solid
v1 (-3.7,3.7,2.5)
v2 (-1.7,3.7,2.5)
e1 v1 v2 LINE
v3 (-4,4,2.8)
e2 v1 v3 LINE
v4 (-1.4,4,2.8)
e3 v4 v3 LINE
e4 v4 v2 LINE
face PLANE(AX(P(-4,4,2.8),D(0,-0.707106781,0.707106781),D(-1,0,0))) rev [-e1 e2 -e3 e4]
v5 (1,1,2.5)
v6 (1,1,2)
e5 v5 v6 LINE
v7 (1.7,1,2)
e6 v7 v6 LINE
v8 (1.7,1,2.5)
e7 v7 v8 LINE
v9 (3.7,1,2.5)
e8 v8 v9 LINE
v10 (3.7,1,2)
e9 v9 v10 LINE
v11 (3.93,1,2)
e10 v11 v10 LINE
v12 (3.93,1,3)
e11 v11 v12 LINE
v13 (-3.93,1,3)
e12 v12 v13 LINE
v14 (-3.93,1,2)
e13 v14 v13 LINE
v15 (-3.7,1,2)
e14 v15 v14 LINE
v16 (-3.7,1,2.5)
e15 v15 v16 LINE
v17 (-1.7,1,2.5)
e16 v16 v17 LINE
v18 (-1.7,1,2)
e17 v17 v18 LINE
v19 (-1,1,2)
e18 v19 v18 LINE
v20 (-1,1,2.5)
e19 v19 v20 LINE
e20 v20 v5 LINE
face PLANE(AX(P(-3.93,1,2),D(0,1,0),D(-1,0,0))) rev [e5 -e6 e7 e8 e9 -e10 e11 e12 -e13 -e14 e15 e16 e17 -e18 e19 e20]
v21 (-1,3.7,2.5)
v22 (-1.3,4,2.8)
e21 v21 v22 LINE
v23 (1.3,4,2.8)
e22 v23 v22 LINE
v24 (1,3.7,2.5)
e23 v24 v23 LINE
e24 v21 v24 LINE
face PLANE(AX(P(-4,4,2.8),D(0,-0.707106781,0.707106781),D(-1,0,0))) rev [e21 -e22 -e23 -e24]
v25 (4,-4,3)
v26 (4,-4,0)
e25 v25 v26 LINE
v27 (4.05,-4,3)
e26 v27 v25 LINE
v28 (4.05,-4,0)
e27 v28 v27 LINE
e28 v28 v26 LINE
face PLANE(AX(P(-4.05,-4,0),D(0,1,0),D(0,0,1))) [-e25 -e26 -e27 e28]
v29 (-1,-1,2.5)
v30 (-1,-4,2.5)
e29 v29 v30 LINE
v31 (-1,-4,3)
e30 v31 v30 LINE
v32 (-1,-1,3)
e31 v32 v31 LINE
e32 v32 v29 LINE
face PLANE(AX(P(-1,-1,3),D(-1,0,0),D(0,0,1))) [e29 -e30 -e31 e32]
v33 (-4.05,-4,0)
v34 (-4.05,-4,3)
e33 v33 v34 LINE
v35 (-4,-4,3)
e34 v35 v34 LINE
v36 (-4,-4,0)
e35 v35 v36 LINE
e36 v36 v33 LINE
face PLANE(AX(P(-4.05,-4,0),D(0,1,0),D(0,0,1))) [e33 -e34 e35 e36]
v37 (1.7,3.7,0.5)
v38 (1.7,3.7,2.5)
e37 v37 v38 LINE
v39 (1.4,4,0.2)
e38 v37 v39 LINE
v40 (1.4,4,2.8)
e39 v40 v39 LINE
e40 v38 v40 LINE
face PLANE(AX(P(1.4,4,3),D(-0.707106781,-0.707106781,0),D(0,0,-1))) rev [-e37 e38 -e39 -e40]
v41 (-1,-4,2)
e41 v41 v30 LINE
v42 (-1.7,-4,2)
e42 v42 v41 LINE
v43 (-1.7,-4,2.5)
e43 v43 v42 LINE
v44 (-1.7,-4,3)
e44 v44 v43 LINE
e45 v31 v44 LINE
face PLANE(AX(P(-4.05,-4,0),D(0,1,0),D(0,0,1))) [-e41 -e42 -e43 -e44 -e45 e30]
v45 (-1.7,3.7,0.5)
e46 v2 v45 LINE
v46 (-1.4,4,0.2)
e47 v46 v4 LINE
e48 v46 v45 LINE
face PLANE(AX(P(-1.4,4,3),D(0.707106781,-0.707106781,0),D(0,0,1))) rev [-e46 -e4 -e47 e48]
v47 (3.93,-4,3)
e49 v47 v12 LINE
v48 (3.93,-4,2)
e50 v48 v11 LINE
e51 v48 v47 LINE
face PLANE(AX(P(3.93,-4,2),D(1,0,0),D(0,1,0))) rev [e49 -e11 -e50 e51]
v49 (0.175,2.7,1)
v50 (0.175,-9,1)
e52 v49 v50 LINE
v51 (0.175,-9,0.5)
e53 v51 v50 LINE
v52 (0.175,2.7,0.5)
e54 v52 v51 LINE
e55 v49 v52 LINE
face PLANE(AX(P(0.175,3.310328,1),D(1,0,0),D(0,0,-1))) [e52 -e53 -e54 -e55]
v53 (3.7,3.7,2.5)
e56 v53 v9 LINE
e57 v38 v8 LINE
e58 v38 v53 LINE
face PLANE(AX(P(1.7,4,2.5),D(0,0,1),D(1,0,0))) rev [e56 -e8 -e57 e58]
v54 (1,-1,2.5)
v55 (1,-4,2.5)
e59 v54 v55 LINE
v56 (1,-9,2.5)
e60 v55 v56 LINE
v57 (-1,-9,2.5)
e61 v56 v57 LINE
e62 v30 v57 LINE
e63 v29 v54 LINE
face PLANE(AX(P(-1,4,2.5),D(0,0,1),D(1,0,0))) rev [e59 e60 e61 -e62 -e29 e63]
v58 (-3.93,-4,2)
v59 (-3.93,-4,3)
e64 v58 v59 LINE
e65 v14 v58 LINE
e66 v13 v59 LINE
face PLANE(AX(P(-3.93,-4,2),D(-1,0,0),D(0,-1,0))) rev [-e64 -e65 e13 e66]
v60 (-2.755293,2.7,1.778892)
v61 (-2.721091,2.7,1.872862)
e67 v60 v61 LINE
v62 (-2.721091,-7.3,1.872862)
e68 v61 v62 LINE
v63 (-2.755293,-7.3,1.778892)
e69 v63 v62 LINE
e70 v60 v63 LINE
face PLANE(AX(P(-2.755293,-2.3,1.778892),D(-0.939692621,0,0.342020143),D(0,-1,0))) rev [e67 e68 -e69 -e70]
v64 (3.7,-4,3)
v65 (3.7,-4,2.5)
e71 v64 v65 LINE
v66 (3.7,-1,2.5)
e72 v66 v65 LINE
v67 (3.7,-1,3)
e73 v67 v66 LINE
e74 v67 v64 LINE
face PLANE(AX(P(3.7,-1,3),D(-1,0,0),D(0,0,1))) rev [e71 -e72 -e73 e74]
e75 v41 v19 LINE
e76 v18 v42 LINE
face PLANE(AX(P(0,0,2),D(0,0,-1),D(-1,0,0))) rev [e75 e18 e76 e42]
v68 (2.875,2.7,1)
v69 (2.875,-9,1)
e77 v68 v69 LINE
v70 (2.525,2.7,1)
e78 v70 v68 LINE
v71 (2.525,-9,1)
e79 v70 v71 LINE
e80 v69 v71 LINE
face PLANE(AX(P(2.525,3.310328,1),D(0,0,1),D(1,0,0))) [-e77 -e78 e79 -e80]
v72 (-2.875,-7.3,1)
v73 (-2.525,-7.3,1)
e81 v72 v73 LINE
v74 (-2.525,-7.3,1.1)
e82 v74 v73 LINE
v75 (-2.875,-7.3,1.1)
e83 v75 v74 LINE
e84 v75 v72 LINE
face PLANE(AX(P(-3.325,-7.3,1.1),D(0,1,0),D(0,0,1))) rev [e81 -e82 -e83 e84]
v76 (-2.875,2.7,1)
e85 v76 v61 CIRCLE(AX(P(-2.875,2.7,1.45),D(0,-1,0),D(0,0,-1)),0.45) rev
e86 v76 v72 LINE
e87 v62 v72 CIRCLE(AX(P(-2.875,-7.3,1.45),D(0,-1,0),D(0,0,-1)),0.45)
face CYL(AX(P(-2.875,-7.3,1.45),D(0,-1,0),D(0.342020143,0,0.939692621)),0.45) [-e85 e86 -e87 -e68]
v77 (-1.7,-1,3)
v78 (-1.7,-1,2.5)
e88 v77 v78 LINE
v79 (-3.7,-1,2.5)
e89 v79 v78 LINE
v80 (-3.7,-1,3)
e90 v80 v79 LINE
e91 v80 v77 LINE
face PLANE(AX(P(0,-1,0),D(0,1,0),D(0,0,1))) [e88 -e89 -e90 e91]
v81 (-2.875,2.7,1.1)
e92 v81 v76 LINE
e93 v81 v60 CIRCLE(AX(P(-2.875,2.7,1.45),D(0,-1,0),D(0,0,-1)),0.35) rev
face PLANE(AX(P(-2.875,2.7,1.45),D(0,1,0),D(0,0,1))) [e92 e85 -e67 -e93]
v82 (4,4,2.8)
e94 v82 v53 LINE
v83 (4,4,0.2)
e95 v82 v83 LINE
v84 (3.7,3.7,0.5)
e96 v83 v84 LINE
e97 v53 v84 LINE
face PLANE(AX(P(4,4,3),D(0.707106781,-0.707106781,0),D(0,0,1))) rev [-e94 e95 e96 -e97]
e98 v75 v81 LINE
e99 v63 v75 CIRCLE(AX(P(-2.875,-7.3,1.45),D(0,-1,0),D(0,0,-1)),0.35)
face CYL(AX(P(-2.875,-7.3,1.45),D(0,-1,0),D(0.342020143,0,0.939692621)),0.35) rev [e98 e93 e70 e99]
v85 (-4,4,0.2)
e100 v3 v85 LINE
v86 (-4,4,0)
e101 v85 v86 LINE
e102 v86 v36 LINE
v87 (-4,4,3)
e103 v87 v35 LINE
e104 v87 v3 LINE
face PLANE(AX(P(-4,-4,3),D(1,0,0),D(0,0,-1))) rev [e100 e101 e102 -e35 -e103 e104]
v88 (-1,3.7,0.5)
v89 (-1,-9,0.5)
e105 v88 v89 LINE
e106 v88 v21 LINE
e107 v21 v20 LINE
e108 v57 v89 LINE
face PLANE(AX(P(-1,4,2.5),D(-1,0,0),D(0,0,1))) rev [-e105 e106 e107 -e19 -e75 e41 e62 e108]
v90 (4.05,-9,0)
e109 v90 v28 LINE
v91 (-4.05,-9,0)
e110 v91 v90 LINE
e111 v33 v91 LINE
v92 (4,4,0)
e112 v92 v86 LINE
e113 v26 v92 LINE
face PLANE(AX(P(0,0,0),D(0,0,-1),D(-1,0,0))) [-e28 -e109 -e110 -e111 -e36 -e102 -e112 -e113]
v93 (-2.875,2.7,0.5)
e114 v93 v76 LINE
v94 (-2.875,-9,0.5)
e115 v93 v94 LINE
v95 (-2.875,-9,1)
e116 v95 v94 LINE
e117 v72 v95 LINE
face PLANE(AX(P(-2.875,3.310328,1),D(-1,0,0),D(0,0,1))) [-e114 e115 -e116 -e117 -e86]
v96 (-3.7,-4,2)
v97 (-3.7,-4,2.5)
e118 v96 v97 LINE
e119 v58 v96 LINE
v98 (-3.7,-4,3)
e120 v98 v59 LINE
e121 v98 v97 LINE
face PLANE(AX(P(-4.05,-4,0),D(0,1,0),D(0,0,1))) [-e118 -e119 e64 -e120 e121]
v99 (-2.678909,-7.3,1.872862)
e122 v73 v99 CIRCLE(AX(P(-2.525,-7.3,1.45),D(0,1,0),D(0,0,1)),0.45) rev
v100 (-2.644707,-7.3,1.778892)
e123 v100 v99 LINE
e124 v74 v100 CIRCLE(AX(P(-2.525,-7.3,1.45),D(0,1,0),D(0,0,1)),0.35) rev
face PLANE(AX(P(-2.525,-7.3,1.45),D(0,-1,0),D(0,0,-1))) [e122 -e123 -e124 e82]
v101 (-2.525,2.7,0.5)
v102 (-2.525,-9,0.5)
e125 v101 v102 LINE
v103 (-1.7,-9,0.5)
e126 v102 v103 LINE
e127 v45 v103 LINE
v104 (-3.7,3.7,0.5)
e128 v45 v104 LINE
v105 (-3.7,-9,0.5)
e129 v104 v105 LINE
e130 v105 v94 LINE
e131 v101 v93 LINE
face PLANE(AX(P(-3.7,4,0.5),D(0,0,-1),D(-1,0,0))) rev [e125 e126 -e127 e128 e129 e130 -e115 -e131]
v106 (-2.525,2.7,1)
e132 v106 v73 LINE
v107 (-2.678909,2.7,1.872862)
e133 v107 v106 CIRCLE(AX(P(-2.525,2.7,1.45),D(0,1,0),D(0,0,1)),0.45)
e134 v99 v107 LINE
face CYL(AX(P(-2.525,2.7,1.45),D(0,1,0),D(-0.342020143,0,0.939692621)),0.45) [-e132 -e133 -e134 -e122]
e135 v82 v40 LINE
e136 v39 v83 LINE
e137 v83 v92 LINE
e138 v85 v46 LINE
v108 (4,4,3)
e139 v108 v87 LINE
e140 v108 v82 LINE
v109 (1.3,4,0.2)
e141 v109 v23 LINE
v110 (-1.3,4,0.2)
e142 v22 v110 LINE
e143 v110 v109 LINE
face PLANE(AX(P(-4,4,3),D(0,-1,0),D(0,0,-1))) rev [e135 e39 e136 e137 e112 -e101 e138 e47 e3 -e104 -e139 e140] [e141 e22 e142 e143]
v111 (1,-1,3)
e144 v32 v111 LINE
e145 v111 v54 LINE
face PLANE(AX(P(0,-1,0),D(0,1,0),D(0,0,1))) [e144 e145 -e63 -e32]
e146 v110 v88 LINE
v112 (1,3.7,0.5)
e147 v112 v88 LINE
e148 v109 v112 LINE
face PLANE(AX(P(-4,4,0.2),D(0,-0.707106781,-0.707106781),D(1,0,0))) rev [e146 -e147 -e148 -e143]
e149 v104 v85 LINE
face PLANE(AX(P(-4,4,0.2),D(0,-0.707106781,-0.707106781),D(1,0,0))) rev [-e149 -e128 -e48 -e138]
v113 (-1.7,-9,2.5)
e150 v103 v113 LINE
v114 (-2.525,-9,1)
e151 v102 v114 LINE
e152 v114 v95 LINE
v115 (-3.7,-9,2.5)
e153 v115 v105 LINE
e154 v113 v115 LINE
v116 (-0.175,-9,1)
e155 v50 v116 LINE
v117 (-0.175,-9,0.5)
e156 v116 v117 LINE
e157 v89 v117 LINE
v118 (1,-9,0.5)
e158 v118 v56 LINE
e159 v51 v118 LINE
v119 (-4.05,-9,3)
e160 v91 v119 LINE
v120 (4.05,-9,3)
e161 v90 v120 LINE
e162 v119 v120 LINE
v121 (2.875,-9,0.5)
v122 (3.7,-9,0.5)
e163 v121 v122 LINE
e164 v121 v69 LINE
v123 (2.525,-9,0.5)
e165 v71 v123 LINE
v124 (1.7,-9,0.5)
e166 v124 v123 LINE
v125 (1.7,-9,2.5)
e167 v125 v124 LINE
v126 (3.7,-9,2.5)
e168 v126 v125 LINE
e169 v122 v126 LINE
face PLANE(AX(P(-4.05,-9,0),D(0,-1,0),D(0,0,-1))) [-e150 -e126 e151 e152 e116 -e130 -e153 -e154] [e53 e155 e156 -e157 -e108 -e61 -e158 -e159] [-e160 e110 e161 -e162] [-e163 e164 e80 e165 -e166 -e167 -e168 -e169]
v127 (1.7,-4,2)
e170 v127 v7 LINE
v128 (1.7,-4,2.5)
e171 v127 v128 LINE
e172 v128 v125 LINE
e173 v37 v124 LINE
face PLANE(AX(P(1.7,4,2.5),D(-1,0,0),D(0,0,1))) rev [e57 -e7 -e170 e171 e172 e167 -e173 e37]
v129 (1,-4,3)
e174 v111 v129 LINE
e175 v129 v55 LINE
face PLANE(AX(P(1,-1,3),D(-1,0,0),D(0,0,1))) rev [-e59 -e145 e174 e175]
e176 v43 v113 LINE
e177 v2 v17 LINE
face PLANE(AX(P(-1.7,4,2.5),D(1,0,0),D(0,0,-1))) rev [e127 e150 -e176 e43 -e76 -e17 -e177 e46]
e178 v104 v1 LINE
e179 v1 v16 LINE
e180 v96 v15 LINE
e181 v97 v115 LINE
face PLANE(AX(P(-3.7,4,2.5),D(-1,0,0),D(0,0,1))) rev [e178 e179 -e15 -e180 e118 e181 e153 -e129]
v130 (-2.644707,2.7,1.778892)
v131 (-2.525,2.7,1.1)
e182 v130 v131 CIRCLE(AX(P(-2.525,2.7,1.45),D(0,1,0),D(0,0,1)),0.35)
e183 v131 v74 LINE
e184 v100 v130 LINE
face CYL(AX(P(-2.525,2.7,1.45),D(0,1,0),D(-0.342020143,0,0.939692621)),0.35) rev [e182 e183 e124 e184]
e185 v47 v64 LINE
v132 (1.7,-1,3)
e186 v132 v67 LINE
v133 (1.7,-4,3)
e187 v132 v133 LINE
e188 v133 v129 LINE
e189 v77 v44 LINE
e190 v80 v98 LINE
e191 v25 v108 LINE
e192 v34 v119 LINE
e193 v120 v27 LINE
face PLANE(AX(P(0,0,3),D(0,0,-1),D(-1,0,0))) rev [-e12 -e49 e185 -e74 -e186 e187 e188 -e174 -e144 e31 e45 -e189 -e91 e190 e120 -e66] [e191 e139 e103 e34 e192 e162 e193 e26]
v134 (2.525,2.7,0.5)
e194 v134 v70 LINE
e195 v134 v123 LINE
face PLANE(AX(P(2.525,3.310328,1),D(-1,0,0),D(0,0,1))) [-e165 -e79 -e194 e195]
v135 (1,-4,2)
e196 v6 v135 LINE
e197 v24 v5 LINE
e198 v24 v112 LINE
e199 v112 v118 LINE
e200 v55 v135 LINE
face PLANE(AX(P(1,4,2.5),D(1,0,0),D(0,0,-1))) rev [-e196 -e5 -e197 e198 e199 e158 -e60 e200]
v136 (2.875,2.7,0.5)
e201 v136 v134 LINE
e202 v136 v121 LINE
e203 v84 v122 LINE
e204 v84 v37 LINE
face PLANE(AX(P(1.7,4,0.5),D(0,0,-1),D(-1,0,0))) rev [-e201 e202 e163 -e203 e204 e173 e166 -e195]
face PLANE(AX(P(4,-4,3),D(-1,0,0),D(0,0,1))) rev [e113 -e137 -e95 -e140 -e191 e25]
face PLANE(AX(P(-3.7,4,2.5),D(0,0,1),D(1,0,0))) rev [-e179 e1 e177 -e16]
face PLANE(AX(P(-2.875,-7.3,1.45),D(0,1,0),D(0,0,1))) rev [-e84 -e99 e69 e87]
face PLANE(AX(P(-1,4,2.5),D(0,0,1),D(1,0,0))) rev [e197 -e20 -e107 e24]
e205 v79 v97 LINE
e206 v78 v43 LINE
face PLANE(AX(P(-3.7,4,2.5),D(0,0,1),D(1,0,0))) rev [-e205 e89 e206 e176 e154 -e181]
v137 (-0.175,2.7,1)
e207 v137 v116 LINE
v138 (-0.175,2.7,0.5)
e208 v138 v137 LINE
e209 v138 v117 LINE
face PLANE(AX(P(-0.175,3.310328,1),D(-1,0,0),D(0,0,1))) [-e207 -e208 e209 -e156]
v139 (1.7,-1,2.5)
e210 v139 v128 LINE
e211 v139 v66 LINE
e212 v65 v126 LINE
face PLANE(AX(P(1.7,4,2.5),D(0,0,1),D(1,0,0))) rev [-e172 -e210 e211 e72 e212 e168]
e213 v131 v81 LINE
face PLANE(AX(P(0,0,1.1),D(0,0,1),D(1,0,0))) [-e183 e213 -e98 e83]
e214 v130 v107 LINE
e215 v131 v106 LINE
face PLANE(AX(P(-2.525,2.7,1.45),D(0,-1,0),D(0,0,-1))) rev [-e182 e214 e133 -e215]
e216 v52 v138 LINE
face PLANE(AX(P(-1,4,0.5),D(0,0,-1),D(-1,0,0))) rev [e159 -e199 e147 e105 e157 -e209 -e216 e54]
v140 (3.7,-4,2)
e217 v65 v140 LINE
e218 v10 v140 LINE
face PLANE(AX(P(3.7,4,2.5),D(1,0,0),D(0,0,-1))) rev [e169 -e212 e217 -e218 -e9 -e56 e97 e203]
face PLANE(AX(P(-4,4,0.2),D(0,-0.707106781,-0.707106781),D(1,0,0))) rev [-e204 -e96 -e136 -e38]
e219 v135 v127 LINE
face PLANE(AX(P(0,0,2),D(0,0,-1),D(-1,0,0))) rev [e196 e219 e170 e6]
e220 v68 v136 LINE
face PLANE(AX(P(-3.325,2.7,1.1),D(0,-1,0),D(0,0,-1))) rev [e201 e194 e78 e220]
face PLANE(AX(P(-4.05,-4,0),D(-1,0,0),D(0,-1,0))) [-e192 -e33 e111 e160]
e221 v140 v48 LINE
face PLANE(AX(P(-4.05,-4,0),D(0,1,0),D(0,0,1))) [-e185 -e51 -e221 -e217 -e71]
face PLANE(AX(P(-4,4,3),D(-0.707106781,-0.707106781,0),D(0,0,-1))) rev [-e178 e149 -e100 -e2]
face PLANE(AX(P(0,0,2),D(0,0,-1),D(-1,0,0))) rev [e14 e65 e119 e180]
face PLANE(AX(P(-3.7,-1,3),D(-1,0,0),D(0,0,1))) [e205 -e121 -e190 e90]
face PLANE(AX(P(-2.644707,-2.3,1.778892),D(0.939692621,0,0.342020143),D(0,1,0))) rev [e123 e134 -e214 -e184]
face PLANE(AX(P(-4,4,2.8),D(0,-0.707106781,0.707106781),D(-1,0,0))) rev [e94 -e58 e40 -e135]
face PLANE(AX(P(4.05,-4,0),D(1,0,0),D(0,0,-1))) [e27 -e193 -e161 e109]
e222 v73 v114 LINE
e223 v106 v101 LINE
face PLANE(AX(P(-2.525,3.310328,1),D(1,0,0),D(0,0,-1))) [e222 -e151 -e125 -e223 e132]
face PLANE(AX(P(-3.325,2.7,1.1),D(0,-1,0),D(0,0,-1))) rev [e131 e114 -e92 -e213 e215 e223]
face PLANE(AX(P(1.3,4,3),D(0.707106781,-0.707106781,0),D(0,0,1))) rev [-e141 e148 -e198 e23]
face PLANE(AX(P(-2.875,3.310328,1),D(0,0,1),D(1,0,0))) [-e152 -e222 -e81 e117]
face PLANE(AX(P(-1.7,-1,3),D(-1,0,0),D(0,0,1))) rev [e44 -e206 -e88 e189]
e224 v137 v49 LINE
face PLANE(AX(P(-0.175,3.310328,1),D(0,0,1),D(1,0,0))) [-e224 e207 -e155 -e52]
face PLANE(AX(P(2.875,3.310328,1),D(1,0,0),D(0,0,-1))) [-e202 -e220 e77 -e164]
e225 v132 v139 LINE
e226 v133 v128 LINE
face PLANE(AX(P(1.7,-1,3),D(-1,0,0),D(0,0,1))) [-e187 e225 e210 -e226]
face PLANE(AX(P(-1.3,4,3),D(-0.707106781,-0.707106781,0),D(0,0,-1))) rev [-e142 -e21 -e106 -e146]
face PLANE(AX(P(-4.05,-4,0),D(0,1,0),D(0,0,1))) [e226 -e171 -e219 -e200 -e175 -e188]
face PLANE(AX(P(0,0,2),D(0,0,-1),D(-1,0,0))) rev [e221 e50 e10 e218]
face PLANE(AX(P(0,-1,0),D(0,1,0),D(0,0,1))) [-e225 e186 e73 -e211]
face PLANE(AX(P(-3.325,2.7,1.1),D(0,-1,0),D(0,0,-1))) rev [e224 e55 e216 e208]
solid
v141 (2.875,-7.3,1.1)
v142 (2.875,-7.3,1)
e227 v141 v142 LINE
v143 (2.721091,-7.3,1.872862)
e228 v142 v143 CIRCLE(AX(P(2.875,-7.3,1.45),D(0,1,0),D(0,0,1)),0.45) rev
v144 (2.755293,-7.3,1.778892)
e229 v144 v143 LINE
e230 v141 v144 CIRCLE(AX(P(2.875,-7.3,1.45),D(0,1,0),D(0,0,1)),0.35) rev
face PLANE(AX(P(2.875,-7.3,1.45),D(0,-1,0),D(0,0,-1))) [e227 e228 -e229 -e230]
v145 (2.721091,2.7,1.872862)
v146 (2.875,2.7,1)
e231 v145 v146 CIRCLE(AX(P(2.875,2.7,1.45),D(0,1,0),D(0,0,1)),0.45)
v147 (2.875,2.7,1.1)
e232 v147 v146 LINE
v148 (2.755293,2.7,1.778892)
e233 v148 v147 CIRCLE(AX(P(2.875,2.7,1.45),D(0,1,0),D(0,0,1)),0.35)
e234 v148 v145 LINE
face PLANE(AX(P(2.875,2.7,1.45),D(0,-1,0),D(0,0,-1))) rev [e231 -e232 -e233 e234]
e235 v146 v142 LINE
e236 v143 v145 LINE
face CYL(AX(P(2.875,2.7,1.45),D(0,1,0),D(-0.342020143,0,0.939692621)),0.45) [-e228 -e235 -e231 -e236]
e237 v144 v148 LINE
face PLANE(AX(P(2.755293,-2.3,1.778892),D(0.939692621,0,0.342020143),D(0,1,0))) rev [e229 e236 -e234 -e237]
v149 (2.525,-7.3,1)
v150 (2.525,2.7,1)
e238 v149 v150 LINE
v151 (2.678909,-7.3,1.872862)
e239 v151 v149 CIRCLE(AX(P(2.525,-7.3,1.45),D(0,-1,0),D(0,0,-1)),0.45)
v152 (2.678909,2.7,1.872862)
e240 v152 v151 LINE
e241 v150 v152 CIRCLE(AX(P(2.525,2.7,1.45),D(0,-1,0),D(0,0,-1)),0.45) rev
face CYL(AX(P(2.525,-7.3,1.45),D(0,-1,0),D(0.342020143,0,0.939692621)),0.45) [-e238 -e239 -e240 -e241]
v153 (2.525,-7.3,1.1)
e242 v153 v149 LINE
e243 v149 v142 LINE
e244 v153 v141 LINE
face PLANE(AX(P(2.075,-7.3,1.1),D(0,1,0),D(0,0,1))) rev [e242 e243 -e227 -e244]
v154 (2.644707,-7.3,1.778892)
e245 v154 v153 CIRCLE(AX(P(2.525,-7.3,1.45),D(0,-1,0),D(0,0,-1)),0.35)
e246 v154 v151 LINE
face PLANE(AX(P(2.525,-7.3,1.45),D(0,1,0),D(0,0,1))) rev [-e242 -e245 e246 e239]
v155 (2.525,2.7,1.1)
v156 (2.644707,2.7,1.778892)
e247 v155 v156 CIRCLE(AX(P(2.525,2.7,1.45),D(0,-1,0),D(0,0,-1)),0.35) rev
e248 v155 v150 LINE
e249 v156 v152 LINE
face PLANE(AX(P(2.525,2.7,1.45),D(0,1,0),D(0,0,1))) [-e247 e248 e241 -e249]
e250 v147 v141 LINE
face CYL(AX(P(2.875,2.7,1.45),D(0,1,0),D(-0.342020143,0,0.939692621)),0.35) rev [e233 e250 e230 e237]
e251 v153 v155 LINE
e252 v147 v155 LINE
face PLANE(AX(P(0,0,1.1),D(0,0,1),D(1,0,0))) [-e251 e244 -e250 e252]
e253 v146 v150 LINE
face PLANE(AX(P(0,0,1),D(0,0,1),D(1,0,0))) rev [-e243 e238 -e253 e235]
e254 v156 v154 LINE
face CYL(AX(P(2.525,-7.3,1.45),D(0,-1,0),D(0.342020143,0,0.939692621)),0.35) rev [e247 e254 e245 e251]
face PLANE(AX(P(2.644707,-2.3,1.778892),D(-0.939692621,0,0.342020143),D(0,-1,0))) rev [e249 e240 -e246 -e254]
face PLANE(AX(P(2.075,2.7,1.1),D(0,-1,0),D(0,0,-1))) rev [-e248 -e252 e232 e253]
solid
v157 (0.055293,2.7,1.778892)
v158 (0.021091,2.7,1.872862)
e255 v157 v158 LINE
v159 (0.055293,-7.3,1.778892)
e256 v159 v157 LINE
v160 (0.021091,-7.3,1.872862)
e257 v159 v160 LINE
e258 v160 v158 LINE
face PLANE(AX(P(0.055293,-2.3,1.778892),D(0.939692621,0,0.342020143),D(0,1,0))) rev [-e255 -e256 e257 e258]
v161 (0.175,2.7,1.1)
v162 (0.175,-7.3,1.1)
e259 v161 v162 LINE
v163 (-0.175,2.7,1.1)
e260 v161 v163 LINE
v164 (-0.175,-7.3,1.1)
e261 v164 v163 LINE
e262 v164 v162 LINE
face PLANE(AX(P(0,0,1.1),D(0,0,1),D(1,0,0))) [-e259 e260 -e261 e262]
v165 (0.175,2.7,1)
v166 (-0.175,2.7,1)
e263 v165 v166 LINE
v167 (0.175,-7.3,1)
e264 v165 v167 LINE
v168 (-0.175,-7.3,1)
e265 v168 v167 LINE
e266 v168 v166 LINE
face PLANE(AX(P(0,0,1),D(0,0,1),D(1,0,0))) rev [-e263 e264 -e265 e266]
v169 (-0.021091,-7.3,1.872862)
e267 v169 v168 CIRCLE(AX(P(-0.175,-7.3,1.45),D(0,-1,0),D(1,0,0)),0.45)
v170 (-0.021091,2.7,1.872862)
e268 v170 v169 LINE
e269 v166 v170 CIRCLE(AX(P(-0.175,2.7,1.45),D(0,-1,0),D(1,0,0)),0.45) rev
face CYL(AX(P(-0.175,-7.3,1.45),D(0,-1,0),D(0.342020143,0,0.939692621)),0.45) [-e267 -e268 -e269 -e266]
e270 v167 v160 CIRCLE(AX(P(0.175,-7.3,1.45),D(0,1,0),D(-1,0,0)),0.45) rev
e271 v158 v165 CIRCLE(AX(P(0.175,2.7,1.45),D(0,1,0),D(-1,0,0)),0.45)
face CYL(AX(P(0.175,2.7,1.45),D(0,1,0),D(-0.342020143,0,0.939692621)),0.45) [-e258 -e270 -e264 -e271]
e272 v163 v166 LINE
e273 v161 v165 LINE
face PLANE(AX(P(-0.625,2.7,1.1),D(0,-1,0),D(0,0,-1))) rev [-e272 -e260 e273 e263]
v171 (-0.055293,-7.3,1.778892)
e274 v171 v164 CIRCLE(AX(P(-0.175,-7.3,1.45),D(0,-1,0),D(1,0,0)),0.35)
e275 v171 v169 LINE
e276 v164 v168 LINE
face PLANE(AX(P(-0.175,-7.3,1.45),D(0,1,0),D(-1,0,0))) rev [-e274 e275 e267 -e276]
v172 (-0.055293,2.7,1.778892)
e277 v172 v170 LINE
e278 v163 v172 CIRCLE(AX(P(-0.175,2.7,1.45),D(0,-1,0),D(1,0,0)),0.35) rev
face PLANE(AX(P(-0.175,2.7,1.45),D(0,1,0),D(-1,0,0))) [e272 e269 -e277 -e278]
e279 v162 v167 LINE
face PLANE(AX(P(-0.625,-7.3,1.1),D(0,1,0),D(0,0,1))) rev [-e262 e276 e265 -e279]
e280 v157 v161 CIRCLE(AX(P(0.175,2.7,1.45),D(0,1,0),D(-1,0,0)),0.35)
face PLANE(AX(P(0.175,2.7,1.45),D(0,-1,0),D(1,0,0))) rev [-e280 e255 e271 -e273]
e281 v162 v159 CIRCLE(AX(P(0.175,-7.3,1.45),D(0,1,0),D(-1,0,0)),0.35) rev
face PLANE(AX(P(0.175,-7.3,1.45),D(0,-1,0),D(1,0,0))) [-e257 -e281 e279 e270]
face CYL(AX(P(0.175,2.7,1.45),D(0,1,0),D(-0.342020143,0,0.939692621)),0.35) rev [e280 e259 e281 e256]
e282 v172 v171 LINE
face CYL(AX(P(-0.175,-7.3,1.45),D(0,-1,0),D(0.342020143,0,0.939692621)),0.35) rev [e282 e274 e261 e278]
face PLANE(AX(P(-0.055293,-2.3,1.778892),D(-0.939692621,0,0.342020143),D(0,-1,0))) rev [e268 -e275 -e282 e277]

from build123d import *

# Parameters (mm, degrees)
SCHIZZO1_W                        = 8
SCHIZZO1_H                        = 8
ESTRUSIONE_ESTRUSIONE1_DEPTH      = 3
SCHIZZO2_W                        = 7.86
SCHIZZO2_H                        = 5
TAGLIO_ESTRUSIONE2_DEPTH          = 1
ESTRUSIONE_ESTRUSIONE2_DEPTH      = 1
ESTRUSIONE_ESTRUSIONE2_DEPTH_BACK = 2
SCHIZZO4_W                        = 8.1
SCHIZZO4_H                        = 5
TAGLIO_ESTRUSIONE3_DEPTH          = 14.942829698
TAGLIO_ESTRUSIONE3_DEPTH_BACK     = 14.942829698
SCHIZZO5_W                        = 2
SCHIZZO5_H                        = 2
SMUSSO2_SIZE                      = 0.3
SCHIZZO6_W                        = 2
SCHIZZO6_H                        = 0.5
ESTRUSIONE_ESTRUSIONE4_DEPTH      = 3
SCHIZZO7_W                        = 1.25
SCHIZZO7_H                        = 10
BASE_FLANGIA1_DEPTH               = 0.1
ORLO1_START                       = -7.3
ORLO1_DEPTH                       = 10
ORLO1_2_DEPTH                     = 10
ORLO2_START                       = -7.3
ORLO2_DEPTH                       = 10
ORLO2_2_DEPTH                     = 10
SCHIZZO17_W                       = 1.25
SCHIZZO17_H                       = 10
BASE_FLANGIA2_DEPTH               = 0.1
ORLO3_START                       = -7.3
ORLO3_DEPTH                       = 10
ORLO3_2_DEPTH                     = 10
SCHIZZO26_W                       = 1.25
SCHIZZO26_H                       = 10
BASE_FLANGIA3_DEPTH               = 0.1
ORLO4_START                       = -7.3
ORLO4_DEPTH                       = 10
ORLO4_2_DEPTH                     = 10
ORLO5_START                       = -7.3
ORLO5_DEPTH                       = 10
ORLO5_2_DEPTH                     = 10
ESTRUSIONE_ESTRUSIONE5_REACH      = 15.943
SCHIZZO37_W                       = 0.35
SCHIZZO37_H                       = 0.5


# Read off the part's stored shape, not the designer's step: Orlo1, Orlo2, Orlo3, Orlo4, Orlo5
# Sheet-metal steps are written as plain solids
with BuildPart() as part:
    # Schizzo1 → Estrusione-Estrusione1 (new body)
    with BuildSketch(Plane.XY):
        Rectangle(SCHIZZO1_W, SCHIZZO1_H)
    extrude(amount=ESTRUSIONE_ESTRUSIONE1_DEPTH)

    # Schizzo2 → Taglio-Estrusione2 (cut)
    with BuildSketch(Plane.XY.offset(3)):
        with Locations((0, -1.5)):
            Rectangle(SCHIZZO2_W, SCHIZZO2_H)
    extrude(amount=-TAGLIO_ESTRUSIONE2_DEPTH, mode=Mode.SUBTRACT)

    # Schizzo4 → Estrusione-Estrusione2 (add, two sides: drawn at the far end of the back side and taken through both)
    with BuildSketch(Plane.XY.offset(2).offset(-ESTRUSIONE_ESTRUSIONE2_DEPTH_BACK)):
        with Locations((0, -6.5)):
            Rectangle(SCHIZZO4_W, SCHIZZO4_H)
    extrude(amount=ESTRUSIONE_ESTRUSIONE2_DEPTH + ESTRUSIONE_ESTRUSIONE2_DEPTH_BACK)

    # Schizzo5 → Taglio-Estrusione3 (cut, two sides: drawn at the far end of the back side and taken through both)
    with BuildSketch(Plane.XZ.offset(9).offset(-TAGLIO_ESTRUSIONE3_DEPTH_BACK)):
        with Locations((-2.7, 1.5)):
            Rectangle(SCHIZZO5_W, SCHIZZO5_H)
        with Locations((0, 1.5)):
            Rectangle(SCHIZZO5_W, SCHIZZO5_H)
        with Locations((2.7, 1.5)):
            Rectangle(SCHIZZO5_W, SCHIZZO5_H)
    extrude(amount=TAGLIO_ESTRUSIONE3_DEPTH + TAGLIO_ESTRUSIONE3_DEPTH_BACK, mode=Mode.SUBTRACT)

    # Smusso2
    smusso2_edges = [part.edges().sort_by_distance(p)[0] for p in [
        (0, 4, 2.5),
        (0, 4, 0.5),
        (3.7, 4, 1.5),
        (1.7, 4, 1.5),
        (2.7, 4, 2.5),
        (2.7, 4, 0.5),
        (-1.7, 4, 1.5),
        (-3.7, 4, 1.5),
        (-2.7, 4, 2.5),
        (-2.7, 4, 0.5),
        (1, 4, 1.5),
        (-1, 4, 1.5),
    ]]
    chamfer(smusso2_edges, length=SMUSSO2_SIZE - 0.0001)  # a hair under: the kernel refuses the full size

    # Schizzo6 → Estrusione-Estrusione4 (add)
    with BuildSketch(Plane(origin=(0, -4, 0), x_dir=(1, 0, 0), z_dir=(0, 1, 0))):
        with Locations((-2.7, -2.75)):
            Rectangle(SCHIZZO6_W, SCHIZZO6_H)
        with Locations((0, -2.75)):
            Rectangle(SCHIZZO6_W, SCHIZZO6_H)
        with Locations((2.7, -2.75)):
            Rectangle(SCHIZZO6_W, SCHIZZO6_H)
    extrude(amount=ESTRUSIONE_ESTRUSIONE4_DEPTH)


with BuildPart() as body_2:
    # Schizzo7 → Base-Flangia1 (new body)
    with BuildSketch(Plane.XY.offset(1)):
        with Locations((-2.7, -2.3)):
            Rectangle(SCHIZZO7_W, SCHIZZO7_H)
    extrude(amount=BASE_FLANGIA1_DEPTH)

    # Orlo1 outline → Orlo1 (cut)
    with BuildSketch(Plane(origin=(0, 0, 0), x_dir=(1, 0, 0), z_dir=(0, 1, 0)).offset(ORLO1_START)):
        with BuildLine():
            ThreePointArc((-2.525, -1), (-2.375, -1.025735931), (-2.242157287, -1.1))
            Line((-2.242157287, -1.1), (-2.075, -1.1))
            Line((-2.075, -1.1), (-2.075, -1))
            Line((-2.075, -1), (-2.525, -1))
        make_face()
    extrude(amount=ORLO1_DEPTH, mode=Mode.SUBTRACT)

    # Orlo1 2 outline → Orlo1 2 (add)
    with BuildSketch(Plane(origin=(0, 0, 0), x_dir=(1, 0, 0), z_dir=(0, 1, 0)).offset(ORLO1_START)):
        with BuildLine():
            Line((-2.64470705, -1.778892417), (-2.678909064, -1.872861679))
            ThreePointArc((-2.678909064, -1.872861679), (-2.133228682, -1.671393845), (-2.242157287, -1.1))
            Line((-2.242157287, -1.1), (-2.525, -1.1))
            ThreePointArc((-2.525, -1.1), (-2.180317286, -1.510776862), (-2.64470705, -1.778892417))
        make_face()
    extrude(amount=ORLO1_2_DEPTH)

    # Orlo2 outline → Orlo2 (cut)
    with BuildSketch(Plane(origin=(0, 0, 0), x_dir=(1, 0, 0), z_dir=(0, 1, 0)).offset(ORLO2_START)):
        with BuildLine():
            Line((-3.325, -1.1), (-3.157842713, -1.1))
            ThreePointArc((-3.157842713, -1.1), (-3.025, -1.025735931), (-2.875, -1))
            Line((-2.875, -1), (-3.325, -1))
            Line((-3.325, -1), (-3.325, -1.1))
        make_face()
    extrude(amount=ORLO2_DEPTH, mode=Mode.SUBTRACT)

    # Orlo2 2 outline → Orlo2 2 (add)
    with BuildSketch(Plane(origin=(0, 0, 0), x_dir=(1, 0, 0), z_dir=(0, 1, 0)).offset(ORLO2_START)):
        with BuildLine():
            Line((-2.721090936, -1.872861679), (-2.75529295, -1.778892417))
            ThreePointArc((-2.75529295, -1.778892417), (-3.219682714, -1.510776862), (-2.875, -1.1))
            Line((-2.875, -1.1), (-3.157842713, -1.1))
            ThreePointArc((-3.157842713, -1.1), (-3.266771318, -1.671393845), (-2.721090936, -1.872861679))
        make_face()
    extrude(amount=ORLO2_2_DEPTH)

    # Estrusione-Estrusione5: up to this face of the body (flat: up to its plane)
    estrusione_estrusione5_end = Plane(body_2.part.faces().sort_by_distance((-2.7, 2.7, 1.015402922))[0])
    # Schizzo37 → Estrusione-Estrusione5 (add, up to the picked face)
    with BuildSketch(Plane.XZ.offset(9), mode=Mode.PRIVATE) as estrusione_estrusione5_sk1:
        with Locations((-2.7, 0.75)):
            Rectangle(SCHIZZO37_W, SCHIZZO37_H)
    estrusione_estrusione5_tool1 = split(extrude(estrusione_estrusione5_sk1.sketch, amount=-ESTRUSIONE_ESTRUSIONE5_REACH, mode=Mode.PRIVATE), bisect_by=estrusione_estrusione5_end, keep=Keep.BOTH, mode=Mode.PRIVATE)
    # Schizzo37 → Estrusione-Estrusione5 (add, up to the picked face)
    with BuildSketch(Plane.XZ.offset(9), mode=Mode.PRIVATE) as estrusione_estrusione5_sk2:
        with Locations((2.7, 0.75)):
            Rectangle(SCHIZZO37_W, SCHIZZO37_H)
    estrusione_estrusione5_tool2 = split(extrude(estrusione_estrusione5_sk2.sketch, amount=-ESTRUSIONE_ESTRUSIONE5_REACH, mode=Mode.PRIVATE), bisect_by=estrusione_estrusione5_end, keep=Keep.BOTH, mode=Mode.PRIVATE)
    # Schizzo37 → Estrusione-Estrusione5 (add, up to the picked face)
    with BuildSketch(Plane.XZ.offset(9), mode=Mode.PRIVATE) as estrusione_estrusione5_sk3:
        with Locations((0, 0.75)):
            Rectangle(SCHIZZO37_W, SCHIZZO37_H)
    estrusione_estrusione5_tool3 = split(extrude(estrusione_estrusione5_sk3.sketch, amount=-ESTRUSIONE_ESTRUSIONE5_REACH, mode=Mode.PRIVATE), bisect_by=estrusione_estrusione5_end, keep=Keep.BOTH, mode=Mode.PRIVATE)

    add(part.part)  # Estrusione-Estrusione5 merges part
    add(estrusione_estrusione5_tool1.solids().sort_by(Axis((-2.7, -9, 0.75), (0, 1, 0)))[0])
    add(estrusione_estrusione5_tool2.solids().sort_by(Axis((2.7, -9, 0.75), (0, 1, 0)))[0])
    add(estrusione_estrusione5_tool3.solids().sort_by(Axis((0, -9, 0.75), (0, 1, 0)))[0])


with BuildPart() as body_3:
    # Schizzo17 → Base-Flangia2 (new body)
    with BuildSketch(Plane.XY.offset(1)):
        with Locations((0, -2.3)):
            Rectangle(SCHIZZO17_W, SCHIZZO17_H)
    extrude(amount=BASE_FLANGIA2_DEPTH)

    # Orlo3 outline → Orlo3 (cut)
    with BuildSketch(Plane(origin=(0, 0, 0), x_dir=(1, 0, 0), z_dir=(0, 1, 0)).offset(ORLO3_START)):
        with BuildLine():
            Line((-0.625, -1.1), (-0.457842713, -1.1))
            ThreePointArc((-0.457842713, -1.1), (-0.325, -1.025735931), (-0.175, -1))
            Line((-0.175, -1), (-0.625, -1))
            Line((-0.625, -1), (-0.625, -1.1))
        make_face()
        with BuildLine():
            ThreePointArc((0.175, -1), (0.325, -1.025735931), (0.457842713, -1.1))
            Line((0.457842713, -1.1), (0.625, -1.1))
            Line((0.625, -1.1), (0.625, -1))
            Line((0.625, -1), (0.175, -1))
        make_face()
    extrude(amount=ORLO3_DEPTH, mode=Mode.SUBTRACT)

    # Orlo3 2 outline → Orlo3 2 (add)
    with BuildSketch(Plane(origin=(0, 0, 0), x_dir=(1, 0, 0), z_dir=(0, 1, 0)).offset(ORLO3_START)):
        with BuildLine():
            Line((-0.021090936, -1.872861679), (-0.05529295, -1.778892417))
            ThreePointArc((-0.05529295, -1.778892417), (-0.519682714, -1.510776862), (-0.175, -1.1))
            Line((-0.175, -1.1), (-0.457842713, -1.1))
            ThreePointArc((-0.457842713, -1.1), (-0.566771318, -1.671393845), (-0.021090936, -1.872861679))
        make_face()
        with BuildLine():
            Line((0.457842713, -1.1), (0.175, -1.1))
            ThreePointArc((0.175, -1.1), (0.519682714, -1.510776862), (0.05529295, -1.778892417))
            Line((0.05529295, -1.778892417), (0.021090936, -1.872861679))
            ThreePointArc((0.021090936, -1.872861679), (0.566771318, -1.671393845), (0.457842713, -1.1))
        make_face()
    extrude(amount=ORLO3_2_DEPTH)


with BuildPart() as body_4:
    # Schizzo26 → Base-Flangia3 (new body)
    with BuildSketch(Plane.XY.offset(1)):
        with Locations((2.7, -2.3)):
            Rectangle(SCHIZZO26_W, SCHIZZO26_H)
    extrude(amount=BASE_FLANGIA3_DEPTH)

    # Orlo4 outline → Orlo4 (cut)
    with BuildSketch(Plane(origin=(0, 0, 0), x_dir=(1, 0, 0), z_dir=(0, 1, 0)).offset(ORLO4_START)):
        with BuildLine():
            ThreePointArc((2.875, -1), (3.025, -1.025735931), (3.157842713, -1.1))
            Line((3.157842713, -1.1), (3.325, -1.1))
            Line((3.325, -1.1), (3.325, -1))
            Line((3.325, -1), (2.875, -1))
        make_face()
    extrude(amount=ORLO4_DEPTH, mode=Mode.SUBTRACT)

    # Orlo4 2 outline → Orlo4 2 (add)
    with BuildSketch(Plane(origin=(0, 0, 0), x_dir=(1, 0, 0), z_dir=(0, 1, 0)).offset(ORLO4_START)):
        with BuildLine():
            Line((2.75529295, -1.778892417), (2.721090936, -1.872861679))
            ThreePointArc((2.721090936, -1.872861679), (3.266771318, -1.671393845), (3.157842713, -1.1))
            Line((3.157842713, -1.1), (2.875, -1.1))
            ThreePointArc((2.875, -1.1), (3.219682714, -1.510776862), (2.75529295, -1.778892417))
        make_face()
    extrude(amount=ORLO4_2_DEPTH)

    # Orlo5 outline → Orlo5 (cut)
    with BuildSketch(Plane(origin=(0, 0, 0), x_dir=(1, 0, 0), z_dir=(0, 1, 0)).offset(ORLO5_START)):
        with BuildLine():
            Line((2.075, -1.1), (2.242157287, -1.1))
            ThreePointArc((2.242157287, -1.1), (2.375, -1.025735931), (2.525, -1))
            Line((2.525, -1), (2.075, -1))
            Line((2.075, -1), (2.075, -1.1))
        make_face()
    extrude(amount=ORLO5_DEPTH, mode=Mode.SUBTRACT)

    # Orlo5 2 outline → Orlo5 2 (add)
    with BuildSketch(Plane(origin=(0, 0, 0), x_dir=(1, 0, 0), z_dir=(0, 1, 0)).offset(ORLO5_START)):
        with BuildLine():
            Line((2.678909064, -1.872861679), (2.64470705, -1.778892417))
            ThreePointArc((2.64470705, -1.778892417), (2.180317286, -1.510776862), (2.525, -1.1))
            Line((2.525, -1.1), (2.242157287, -1.1))
            ThreePointArc((2.242157287, -1.1), (2.133228682, -1.671393845), (2.678909064, -1.872861679))
        make_face()
    extrude(amount=ORLO5_2_DEPTH)


solid = Compound([body_2.part, body_3.part, body_4.part])
